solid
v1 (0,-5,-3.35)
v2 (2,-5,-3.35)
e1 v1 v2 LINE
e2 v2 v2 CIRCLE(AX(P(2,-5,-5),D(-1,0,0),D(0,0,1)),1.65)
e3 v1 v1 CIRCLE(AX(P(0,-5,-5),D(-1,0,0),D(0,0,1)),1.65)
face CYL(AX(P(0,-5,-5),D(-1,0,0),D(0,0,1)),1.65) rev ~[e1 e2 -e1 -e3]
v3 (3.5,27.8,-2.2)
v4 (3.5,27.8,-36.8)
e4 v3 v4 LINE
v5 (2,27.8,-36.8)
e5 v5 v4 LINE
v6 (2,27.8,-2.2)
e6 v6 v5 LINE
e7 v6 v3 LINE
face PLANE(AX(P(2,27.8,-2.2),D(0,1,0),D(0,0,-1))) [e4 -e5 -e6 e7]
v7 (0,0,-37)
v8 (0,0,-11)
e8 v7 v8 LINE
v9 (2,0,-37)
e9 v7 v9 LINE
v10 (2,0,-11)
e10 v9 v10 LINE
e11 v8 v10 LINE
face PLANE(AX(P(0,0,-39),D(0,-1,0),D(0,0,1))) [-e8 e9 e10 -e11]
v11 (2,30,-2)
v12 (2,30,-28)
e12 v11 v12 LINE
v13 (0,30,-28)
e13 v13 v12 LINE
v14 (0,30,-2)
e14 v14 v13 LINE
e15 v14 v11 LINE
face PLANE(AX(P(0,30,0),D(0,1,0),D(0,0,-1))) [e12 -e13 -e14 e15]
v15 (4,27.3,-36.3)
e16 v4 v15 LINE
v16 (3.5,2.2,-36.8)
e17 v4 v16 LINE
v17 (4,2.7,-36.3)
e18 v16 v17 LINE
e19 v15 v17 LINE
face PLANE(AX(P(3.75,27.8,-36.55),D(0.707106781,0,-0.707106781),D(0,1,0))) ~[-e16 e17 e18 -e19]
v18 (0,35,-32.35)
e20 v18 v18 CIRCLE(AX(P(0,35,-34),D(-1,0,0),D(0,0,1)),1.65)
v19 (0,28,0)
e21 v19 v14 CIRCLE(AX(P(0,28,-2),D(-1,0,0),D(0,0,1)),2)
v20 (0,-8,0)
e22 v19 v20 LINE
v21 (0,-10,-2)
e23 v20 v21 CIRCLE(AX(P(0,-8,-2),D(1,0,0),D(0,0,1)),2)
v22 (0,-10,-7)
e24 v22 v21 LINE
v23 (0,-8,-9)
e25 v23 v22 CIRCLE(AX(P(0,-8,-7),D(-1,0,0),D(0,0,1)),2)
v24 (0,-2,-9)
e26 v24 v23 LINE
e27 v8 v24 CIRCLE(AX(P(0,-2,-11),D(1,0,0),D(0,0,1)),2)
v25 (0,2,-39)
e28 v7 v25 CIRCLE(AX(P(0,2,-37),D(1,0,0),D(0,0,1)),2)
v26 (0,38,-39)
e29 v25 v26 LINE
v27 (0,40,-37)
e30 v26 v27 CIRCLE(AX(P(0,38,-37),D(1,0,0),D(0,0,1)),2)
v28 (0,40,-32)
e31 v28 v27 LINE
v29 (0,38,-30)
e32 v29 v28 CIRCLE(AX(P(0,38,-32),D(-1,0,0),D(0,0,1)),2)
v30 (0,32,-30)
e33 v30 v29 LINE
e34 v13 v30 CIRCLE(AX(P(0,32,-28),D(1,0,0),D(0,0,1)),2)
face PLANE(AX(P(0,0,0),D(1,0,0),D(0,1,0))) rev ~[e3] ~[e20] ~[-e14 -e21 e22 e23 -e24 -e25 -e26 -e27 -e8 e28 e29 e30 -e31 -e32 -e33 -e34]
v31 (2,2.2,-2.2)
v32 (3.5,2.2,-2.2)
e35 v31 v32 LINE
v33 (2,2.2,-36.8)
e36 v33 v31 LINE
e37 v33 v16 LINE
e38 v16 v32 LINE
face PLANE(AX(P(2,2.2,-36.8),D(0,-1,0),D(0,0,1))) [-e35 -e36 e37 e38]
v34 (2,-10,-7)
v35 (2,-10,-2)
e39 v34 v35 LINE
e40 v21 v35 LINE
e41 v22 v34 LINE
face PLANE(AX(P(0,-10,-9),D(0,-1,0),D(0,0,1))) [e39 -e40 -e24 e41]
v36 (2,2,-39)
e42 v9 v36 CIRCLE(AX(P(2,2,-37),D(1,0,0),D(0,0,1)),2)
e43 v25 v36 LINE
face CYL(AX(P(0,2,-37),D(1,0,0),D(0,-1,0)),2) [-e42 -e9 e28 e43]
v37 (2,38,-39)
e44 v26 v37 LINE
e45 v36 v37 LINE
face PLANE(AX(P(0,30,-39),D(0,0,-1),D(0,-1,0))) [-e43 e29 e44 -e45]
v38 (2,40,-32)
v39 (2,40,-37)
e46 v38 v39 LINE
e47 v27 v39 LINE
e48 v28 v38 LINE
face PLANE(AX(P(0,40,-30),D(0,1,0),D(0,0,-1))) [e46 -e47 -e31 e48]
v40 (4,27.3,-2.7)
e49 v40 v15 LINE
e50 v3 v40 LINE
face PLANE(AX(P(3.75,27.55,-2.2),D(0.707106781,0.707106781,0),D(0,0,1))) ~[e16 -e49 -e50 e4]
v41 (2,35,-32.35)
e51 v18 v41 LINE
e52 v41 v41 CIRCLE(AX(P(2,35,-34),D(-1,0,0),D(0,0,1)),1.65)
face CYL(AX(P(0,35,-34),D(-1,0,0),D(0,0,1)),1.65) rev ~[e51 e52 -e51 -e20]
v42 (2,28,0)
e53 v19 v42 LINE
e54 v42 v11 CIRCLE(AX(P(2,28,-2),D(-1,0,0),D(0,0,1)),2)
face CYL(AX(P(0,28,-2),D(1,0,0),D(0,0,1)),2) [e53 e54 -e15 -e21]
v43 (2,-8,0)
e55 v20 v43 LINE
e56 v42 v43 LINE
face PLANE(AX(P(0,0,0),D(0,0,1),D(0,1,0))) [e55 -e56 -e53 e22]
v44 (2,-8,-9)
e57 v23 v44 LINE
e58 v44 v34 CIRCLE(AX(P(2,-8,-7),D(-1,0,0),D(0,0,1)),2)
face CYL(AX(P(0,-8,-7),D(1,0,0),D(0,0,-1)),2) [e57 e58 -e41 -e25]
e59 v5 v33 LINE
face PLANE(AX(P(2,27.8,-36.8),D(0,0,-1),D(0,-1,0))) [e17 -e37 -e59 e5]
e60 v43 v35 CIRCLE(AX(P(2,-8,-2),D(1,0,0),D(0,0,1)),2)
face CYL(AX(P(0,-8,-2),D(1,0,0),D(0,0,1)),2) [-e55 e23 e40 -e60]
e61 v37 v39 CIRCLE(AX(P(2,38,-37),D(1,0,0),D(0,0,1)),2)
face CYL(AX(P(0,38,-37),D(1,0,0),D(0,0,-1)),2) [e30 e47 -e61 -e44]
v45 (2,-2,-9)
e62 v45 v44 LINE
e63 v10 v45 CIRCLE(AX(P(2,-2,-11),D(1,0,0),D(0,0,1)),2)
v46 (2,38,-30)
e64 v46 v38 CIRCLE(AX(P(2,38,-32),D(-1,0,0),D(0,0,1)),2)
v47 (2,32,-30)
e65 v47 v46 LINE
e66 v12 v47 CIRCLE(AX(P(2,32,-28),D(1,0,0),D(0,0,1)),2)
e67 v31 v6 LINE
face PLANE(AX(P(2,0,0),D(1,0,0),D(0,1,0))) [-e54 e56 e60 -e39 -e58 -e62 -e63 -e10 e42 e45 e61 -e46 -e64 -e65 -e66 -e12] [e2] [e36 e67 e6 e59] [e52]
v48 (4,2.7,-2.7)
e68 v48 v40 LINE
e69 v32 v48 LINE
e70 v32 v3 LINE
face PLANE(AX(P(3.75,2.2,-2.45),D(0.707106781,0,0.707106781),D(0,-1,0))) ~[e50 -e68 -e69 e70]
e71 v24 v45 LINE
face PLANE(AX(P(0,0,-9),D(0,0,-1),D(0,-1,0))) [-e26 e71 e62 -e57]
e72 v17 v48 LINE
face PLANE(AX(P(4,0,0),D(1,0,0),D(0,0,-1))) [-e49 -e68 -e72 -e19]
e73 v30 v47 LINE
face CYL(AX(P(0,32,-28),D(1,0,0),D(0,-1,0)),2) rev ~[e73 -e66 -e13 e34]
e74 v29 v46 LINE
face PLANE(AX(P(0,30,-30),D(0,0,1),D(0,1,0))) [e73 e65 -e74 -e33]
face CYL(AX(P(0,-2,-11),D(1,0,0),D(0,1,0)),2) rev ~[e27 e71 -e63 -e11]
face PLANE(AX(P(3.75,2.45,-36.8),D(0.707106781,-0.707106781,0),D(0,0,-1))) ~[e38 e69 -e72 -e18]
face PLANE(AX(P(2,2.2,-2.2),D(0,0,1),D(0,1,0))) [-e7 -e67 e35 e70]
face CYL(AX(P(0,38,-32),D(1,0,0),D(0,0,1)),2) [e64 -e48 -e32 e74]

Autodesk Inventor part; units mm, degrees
ref_plane "YZ Plane" through (0, 0, 0) normal (1, 0, 0) x (0, 1, 0)
ref_plane "XZ Plane" through (0, 0, 0) normal (0, 1, 0) x (-1, 0, 0)
ref_plane "XY Plane" through (0, 0, 0) normal (0, 0, 1) x (1, 0, 0)
sketch "Skizze1" plane through (0, 0, 0) normal (1, 0, 0) x (0, 1, 0)
  line L0 (0, 0) -> (30, 0)
  line L1 (30, 0) -> (30, -39)
  line L2 (30, -39) -> (0, -39)
  line L3 (0, -39) -> (0, 0)
  dimension "d0" = 30
  dimension "d1" = 39
extrude "Extrusion1" add sketch "Skizze1" along normal blind 2
sketch "Skizze2" plane through (2, 0, 0) normal (1, 0, 0) x (0, 0, -1)
  line L0 (2.2, 27.8) -> (36.8, 27.8)
  line L1 (36.8, 27.8) -> (36.8, 2.2)
  line L2 (36.8, 2.2) -> (2.2, 2.2)
  line L3 (2.2, 2.2) -> (2.2, 27.8)
  line L4 (0, 30) -> (0, 0) projected
  line L5 (39, 30) -> (0, 30) projected
  dimension "d4" = 25.6
  dimension "d5" = 34.6
  dimension "d6" = 2.2
  dimension "d7" = 2.2
extrude "Extrusion2" add sketch "Skizze2" along normal blind 2
chamfer "Fase1" distance 0.5 angle 45 4 edges at (4, 27.8, -19.5) (4, 15, -2.2) (4, 2.2, -19.5) (4, 15, -36.8)
sketch "Skizze3" plane through (0, 0, 0) normal (-1, 0, 0) x (0, 0, 1)
  line L0 (0, 0) -> (-39, 0) projected
  line L1 (0, 0) -> (-9, 0)
  line L2 (-9, 0) -> (-9, -10)
  line L3 (-9, -10) -> (0, -10)
  line L4 (0, -10) -> (0, 0)
  line L5 (-39, 0) -> (-39, 30) projected
  line L6 (-39, 30) -> (-30, 30)
  line L7 (-30, 30) -> (-30, 40)
  line L8 (-30, 40) -> (-39, 40)
  line L9 (-39, 40) -> (-39, 30)
  circle A0 centre (-5, -5) radius 1.65
  circle A1 centre (-34, 35) radius 1.65
  dimension "d13" = 10
  dimension "d14" = 9
  dimension "d15" = 9
  dimension "d16" = 10
  dimension "d17" = 5
  dimension "d18" = 5
  dimension "d19" = 3.3
  dimension "d20" = 5
  dimension "d21" = 5
  dimension "d22" = 3.3
extrude "Extrusion3" add sketch "Skizze3" against normal blind 2
fillet "Rundung1" radius 2 8 edges at (1, -10, 0) (1, -10, -9) (1, 0, -39) (1, 40, -39) (1, 0, -9) (1, 40, -30) (1, 30, -30) (1, 30, 0)
properties part number "deckel_wemos"
